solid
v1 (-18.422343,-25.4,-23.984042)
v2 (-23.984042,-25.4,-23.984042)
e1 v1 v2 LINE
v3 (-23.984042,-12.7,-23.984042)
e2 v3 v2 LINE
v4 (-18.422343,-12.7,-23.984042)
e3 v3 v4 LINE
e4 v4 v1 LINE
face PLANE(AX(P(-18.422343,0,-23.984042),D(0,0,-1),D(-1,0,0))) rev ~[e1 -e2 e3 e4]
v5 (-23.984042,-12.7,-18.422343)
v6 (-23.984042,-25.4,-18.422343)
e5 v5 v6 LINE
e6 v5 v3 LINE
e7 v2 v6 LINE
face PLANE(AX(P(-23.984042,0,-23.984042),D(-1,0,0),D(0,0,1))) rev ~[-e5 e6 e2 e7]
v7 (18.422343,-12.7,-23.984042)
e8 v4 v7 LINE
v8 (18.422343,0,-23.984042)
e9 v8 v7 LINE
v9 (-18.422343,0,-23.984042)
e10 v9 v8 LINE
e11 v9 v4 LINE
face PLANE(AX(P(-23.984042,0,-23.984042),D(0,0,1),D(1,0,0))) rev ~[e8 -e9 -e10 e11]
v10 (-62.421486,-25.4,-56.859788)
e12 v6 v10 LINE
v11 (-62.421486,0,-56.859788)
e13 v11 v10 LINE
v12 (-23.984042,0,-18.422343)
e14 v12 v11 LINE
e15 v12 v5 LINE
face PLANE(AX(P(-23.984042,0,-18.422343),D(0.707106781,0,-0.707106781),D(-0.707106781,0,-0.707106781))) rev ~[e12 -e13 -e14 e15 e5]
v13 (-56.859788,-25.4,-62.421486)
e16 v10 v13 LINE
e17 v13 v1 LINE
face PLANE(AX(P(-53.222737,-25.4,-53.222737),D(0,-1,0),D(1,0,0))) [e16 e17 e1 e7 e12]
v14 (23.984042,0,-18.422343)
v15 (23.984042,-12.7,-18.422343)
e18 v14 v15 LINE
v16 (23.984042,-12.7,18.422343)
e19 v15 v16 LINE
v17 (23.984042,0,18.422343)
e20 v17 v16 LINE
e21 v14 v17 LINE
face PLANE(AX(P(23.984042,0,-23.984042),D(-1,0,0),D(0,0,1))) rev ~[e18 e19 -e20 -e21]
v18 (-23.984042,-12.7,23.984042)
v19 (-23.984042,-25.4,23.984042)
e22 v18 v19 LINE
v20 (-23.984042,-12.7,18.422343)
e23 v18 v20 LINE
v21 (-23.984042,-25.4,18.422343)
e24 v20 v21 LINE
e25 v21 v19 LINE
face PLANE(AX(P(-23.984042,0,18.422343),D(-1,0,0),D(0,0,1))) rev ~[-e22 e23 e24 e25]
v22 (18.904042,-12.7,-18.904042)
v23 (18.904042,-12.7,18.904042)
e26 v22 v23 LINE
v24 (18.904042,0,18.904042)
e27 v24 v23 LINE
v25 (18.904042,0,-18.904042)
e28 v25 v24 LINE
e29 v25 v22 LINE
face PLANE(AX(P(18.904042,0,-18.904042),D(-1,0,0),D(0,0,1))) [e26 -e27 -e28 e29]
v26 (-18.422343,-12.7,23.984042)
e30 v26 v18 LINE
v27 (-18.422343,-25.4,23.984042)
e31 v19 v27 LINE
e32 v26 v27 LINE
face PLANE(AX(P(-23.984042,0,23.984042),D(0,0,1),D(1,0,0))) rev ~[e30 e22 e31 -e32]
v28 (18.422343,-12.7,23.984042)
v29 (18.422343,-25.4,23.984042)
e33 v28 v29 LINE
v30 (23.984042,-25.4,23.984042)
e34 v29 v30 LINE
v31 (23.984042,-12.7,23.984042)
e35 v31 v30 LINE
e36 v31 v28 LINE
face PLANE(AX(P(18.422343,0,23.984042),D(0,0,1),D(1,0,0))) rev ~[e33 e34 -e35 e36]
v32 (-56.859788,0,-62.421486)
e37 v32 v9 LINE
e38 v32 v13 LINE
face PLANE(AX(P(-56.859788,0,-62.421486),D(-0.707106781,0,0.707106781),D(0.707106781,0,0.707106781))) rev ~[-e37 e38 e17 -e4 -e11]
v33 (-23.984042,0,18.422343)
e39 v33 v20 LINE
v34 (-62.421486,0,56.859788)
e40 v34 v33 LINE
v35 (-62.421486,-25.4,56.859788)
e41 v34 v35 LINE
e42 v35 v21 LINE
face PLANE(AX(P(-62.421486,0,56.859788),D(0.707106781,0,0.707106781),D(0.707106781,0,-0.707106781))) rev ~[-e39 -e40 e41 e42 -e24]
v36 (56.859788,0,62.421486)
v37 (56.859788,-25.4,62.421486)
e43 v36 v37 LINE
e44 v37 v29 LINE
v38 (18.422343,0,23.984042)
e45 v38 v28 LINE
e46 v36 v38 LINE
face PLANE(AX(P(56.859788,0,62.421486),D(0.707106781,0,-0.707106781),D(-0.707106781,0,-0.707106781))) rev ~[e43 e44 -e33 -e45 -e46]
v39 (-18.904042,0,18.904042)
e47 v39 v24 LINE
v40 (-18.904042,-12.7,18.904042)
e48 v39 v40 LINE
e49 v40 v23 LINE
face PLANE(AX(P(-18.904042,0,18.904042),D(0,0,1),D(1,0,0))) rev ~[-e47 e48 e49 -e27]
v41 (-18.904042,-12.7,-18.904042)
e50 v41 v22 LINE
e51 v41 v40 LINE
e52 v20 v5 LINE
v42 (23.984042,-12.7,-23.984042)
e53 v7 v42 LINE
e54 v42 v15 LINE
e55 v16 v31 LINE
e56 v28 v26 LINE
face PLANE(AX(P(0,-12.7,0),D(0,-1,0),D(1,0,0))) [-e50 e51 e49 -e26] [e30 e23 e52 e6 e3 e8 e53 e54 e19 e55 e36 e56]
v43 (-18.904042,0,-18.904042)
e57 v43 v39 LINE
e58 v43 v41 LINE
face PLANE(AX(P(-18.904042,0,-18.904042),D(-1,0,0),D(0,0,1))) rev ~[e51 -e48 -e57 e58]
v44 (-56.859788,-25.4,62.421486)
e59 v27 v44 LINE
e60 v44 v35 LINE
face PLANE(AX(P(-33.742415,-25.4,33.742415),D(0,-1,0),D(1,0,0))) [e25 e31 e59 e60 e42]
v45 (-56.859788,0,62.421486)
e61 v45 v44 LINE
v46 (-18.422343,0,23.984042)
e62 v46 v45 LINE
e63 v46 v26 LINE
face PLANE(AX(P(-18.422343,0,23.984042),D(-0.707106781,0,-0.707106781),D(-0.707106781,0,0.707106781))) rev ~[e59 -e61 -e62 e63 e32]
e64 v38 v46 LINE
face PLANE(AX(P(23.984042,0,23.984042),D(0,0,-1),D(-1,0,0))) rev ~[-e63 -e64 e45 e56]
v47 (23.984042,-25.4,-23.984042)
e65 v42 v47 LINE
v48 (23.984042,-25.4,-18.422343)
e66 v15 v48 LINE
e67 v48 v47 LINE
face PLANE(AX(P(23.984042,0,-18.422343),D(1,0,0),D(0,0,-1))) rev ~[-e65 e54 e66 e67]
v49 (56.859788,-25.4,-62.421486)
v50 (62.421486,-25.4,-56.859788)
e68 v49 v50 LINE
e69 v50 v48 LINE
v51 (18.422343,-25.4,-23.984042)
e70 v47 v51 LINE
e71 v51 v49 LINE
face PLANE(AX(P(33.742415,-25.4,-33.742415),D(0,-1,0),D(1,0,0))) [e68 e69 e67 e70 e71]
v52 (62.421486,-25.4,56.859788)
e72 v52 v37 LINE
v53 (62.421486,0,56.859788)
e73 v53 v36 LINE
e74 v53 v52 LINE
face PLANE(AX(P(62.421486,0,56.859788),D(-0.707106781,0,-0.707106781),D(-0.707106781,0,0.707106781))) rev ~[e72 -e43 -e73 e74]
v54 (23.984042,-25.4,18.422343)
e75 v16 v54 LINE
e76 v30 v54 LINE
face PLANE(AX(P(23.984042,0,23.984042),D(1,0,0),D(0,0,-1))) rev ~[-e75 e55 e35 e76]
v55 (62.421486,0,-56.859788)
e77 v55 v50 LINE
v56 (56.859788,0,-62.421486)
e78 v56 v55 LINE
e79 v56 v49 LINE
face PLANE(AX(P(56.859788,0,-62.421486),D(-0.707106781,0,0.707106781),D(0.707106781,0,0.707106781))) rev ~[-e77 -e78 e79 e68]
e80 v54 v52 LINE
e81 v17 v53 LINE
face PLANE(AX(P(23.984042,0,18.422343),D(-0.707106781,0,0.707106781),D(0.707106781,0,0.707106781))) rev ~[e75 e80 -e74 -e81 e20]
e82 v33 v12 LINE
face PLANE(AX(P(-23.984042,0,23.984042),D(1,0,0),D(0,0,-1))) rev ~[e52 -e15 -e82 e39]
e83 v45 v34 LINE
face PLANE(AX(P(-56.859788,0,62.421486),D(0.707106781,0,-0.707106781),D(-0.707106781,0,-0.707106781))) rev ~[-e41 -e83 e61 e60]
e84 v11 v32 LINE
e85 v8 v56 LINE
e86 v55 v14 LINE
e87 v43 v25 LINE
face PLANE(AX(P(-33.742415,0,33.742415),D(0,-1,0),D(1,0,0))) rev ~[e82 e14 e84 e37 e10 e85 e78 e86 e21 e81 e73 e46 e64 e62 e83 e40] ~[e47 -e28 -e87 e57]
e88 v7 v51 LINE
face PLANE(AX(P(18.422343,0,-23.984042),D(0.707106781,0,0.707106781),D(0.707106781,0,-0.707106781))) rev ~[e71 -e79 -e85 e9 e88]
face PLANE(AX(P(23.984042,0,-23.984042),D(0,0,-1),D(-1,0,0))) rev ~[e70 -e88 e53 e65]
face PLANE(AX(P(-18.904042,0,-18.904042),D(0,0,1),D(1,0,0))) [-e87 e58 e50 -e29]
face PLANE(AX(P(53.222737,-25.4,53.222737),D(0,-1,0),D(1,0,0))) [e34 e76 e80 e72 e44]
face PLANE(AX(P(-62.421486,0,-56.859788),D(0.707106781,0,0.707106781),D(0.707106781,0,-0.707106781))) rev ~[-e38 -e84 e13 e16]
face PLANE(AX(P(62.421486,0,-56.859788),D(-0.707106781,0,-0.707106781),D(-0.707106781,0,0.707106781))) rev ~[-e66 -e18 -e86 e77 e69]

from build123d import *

# Parameters (mm, degrees)
F0_W     = 37.8080839926
F0_H     = 37.8080839926
F1_DEPTH = 12.7
F4_DEPTH = 25.4


# Not quite as in the source:
# - the program builds the solid bodies; features that only make, move or delete a surface that nothing else refers to are left out


with BuildPart() as f1:
    # F0 (on Front) → F1 (new body)
    with BuildSketch(Plane.XZ):
        Polygon((23.9840419963, 18.4223433702), (23.9840419963, 23.9840419963), (18.4223433702, 23.9840419963), (-18.4223433702, 23.9840419963), (-23.9840419963, 23.9840419963), (-23.9840419963, 18.4223433702), (-23.9840419963, -18.4223433702), (-23.9840419963, -23.9840419963), (-18.4223433702, -23.9840419963), (18.4223433702, -23.9840419963), (23.9840419963, -23.9840419963), (23.9840419963, -18.4223433702), align=None)
        Rectangle(F0_W, F0_H, mode=Mode.SUBTRACT)
    extrude(amount=F1_DEPTH)

    # F0 (on Front) → F4 (join)
    with BuildSketch(Plane.XZ):
        with BuildLine():
            Line((-23.9840419963, 23.9840419963), (-18.4223433702, 23.9840419963))
            Line((-18.4223433702, 23.9840419963), (-44.0913446559, 49.653043282))
            ThreePointArc((-44.0913446559, 49.653043282), (-46.5728804881, 46.5728804881), (-49.653043282, 44.0913446559))
            Line((-49.653043282, 44.0913446559), (-23.9840419963, 18.4223433702))
            Line((-23.9840419963, 18.4223433702), (-23.9840419963, 23.9840419963))
        make_face()
        with BuildLine():
            ThreePointArc((-49.653043282, 44.0913446559), (-46.5728804881, 46.5728804881), (-44.0913446559, 49.653043282))
            Line((-44.0913446559, 49.653043282), (-56.85978783, 62.4214864561))
            Line((-56.85978783, 62.4214864561), (-62.4214864561, 56.85978783))
            Line((-62.4214864561, 56.85978783), (-49.653043282, 44.0913446559))
        make_face()
        with BuildLine():
            ThreePointArc((-44.0913446559, -49.653043282), (-46.5728804881, -46.5728804881), (-49.653043282, -44.0913446559))
            Line((-49.653043282, -44.0913446559), (-62.4214864561, -56.85978783))
            Line((-62.4214864561, -56.85978783), (-56.85978783, -62.4214864561))
            Line((-56.85978783, -62.4214864561), (-44.0913446559, -49.653043282))
        make_face()
        with BuildLine():
            Line((-23.9840419963, -23.9840419963), (-23.9840419963, -18.4223433702))
            Line((-23.9840419963, -18.4223433702), (-49.653043282, -44.0913446559))
            ThreePointArc((-49.653043282, -44.0913446559), (-46.5728804881, -46.5728804881), (-44.0913446559, -49.653043282))
            Line((-44.0913446559, -49.653043282), (-18.4223433702, -23.9840419963))
            Line((-18.4223433702, -23.9840419963), (-23.9840419963, -23.9840419963))
        make_face()
        with BuildLine():
            Line((49.653043282, -44.0913446559), (23.9840419963, -18.4223433702))
            Line((23.9840419963, -18.4223433702), (23.9840419963, -23.9840419963))
            Line((23.9840419963, -23.9840419963), (18.4223433702, -23.9840419963))
            Line((18.4223433702, -23.9840419963), (44.0913446559, -49.653043282))
            ThreePointArc((44.0913446559, -49.653043282), (46.5728804881, -46.5728804881), (49.653043282, -44.0913446559))
        make_face()
        with BuildLine():
            Line((62.4214864561, -56.85978783), (49.653043282, -44.0913446559))
            ThreePointArc((49.653043282, -44.0913446559), (46.5728804881, -46.5728804881), (44.0913446559, -49.653043282))
            Line((44.0913446559, -49.653043282), (56.85978783, -62.4214864561))
            Line((56.85978783, -62.4214864561), (62.4214864561, -56.85978783))
        make_face()
        with BuildLine():
            Line((56.85978783, 62.4214864561), (44.0913446559, 49.653043282))
            ThreePointArc((44.0913446559, 49.653043282), (46.5728804881, 46.5728804881), (49.653043282, 44.0913446559))
            Line((49.653043282, 44.0913446559), (62.4214864561, 56.85978783))
            Line((62.4214864561, 56.85978783), (56.85978783, 62.4214864561))
        make_face()
        with BuildLine():
            Line((18.4223433702, 23.9840419963), (23.9840419963, 23.9840419963))
            Line((23.9840419963, 23.9840419963), (23.9840419963, 18.4223433702))
            Line((23.9840419963, 18.4223433702), (49.653043282, 44.0913446559))
            ThreePointArc((49.653043282, 44.0913446559), (46.5728804881, 46.5728804881), (44.0913446559, 49.653043282))
            Line((44.0913446559, 49.653043282), (18.4223433702, 23.9840419963))
        make_face()
    extrude(amount=F4_DEPTH)


solid = f1.part
